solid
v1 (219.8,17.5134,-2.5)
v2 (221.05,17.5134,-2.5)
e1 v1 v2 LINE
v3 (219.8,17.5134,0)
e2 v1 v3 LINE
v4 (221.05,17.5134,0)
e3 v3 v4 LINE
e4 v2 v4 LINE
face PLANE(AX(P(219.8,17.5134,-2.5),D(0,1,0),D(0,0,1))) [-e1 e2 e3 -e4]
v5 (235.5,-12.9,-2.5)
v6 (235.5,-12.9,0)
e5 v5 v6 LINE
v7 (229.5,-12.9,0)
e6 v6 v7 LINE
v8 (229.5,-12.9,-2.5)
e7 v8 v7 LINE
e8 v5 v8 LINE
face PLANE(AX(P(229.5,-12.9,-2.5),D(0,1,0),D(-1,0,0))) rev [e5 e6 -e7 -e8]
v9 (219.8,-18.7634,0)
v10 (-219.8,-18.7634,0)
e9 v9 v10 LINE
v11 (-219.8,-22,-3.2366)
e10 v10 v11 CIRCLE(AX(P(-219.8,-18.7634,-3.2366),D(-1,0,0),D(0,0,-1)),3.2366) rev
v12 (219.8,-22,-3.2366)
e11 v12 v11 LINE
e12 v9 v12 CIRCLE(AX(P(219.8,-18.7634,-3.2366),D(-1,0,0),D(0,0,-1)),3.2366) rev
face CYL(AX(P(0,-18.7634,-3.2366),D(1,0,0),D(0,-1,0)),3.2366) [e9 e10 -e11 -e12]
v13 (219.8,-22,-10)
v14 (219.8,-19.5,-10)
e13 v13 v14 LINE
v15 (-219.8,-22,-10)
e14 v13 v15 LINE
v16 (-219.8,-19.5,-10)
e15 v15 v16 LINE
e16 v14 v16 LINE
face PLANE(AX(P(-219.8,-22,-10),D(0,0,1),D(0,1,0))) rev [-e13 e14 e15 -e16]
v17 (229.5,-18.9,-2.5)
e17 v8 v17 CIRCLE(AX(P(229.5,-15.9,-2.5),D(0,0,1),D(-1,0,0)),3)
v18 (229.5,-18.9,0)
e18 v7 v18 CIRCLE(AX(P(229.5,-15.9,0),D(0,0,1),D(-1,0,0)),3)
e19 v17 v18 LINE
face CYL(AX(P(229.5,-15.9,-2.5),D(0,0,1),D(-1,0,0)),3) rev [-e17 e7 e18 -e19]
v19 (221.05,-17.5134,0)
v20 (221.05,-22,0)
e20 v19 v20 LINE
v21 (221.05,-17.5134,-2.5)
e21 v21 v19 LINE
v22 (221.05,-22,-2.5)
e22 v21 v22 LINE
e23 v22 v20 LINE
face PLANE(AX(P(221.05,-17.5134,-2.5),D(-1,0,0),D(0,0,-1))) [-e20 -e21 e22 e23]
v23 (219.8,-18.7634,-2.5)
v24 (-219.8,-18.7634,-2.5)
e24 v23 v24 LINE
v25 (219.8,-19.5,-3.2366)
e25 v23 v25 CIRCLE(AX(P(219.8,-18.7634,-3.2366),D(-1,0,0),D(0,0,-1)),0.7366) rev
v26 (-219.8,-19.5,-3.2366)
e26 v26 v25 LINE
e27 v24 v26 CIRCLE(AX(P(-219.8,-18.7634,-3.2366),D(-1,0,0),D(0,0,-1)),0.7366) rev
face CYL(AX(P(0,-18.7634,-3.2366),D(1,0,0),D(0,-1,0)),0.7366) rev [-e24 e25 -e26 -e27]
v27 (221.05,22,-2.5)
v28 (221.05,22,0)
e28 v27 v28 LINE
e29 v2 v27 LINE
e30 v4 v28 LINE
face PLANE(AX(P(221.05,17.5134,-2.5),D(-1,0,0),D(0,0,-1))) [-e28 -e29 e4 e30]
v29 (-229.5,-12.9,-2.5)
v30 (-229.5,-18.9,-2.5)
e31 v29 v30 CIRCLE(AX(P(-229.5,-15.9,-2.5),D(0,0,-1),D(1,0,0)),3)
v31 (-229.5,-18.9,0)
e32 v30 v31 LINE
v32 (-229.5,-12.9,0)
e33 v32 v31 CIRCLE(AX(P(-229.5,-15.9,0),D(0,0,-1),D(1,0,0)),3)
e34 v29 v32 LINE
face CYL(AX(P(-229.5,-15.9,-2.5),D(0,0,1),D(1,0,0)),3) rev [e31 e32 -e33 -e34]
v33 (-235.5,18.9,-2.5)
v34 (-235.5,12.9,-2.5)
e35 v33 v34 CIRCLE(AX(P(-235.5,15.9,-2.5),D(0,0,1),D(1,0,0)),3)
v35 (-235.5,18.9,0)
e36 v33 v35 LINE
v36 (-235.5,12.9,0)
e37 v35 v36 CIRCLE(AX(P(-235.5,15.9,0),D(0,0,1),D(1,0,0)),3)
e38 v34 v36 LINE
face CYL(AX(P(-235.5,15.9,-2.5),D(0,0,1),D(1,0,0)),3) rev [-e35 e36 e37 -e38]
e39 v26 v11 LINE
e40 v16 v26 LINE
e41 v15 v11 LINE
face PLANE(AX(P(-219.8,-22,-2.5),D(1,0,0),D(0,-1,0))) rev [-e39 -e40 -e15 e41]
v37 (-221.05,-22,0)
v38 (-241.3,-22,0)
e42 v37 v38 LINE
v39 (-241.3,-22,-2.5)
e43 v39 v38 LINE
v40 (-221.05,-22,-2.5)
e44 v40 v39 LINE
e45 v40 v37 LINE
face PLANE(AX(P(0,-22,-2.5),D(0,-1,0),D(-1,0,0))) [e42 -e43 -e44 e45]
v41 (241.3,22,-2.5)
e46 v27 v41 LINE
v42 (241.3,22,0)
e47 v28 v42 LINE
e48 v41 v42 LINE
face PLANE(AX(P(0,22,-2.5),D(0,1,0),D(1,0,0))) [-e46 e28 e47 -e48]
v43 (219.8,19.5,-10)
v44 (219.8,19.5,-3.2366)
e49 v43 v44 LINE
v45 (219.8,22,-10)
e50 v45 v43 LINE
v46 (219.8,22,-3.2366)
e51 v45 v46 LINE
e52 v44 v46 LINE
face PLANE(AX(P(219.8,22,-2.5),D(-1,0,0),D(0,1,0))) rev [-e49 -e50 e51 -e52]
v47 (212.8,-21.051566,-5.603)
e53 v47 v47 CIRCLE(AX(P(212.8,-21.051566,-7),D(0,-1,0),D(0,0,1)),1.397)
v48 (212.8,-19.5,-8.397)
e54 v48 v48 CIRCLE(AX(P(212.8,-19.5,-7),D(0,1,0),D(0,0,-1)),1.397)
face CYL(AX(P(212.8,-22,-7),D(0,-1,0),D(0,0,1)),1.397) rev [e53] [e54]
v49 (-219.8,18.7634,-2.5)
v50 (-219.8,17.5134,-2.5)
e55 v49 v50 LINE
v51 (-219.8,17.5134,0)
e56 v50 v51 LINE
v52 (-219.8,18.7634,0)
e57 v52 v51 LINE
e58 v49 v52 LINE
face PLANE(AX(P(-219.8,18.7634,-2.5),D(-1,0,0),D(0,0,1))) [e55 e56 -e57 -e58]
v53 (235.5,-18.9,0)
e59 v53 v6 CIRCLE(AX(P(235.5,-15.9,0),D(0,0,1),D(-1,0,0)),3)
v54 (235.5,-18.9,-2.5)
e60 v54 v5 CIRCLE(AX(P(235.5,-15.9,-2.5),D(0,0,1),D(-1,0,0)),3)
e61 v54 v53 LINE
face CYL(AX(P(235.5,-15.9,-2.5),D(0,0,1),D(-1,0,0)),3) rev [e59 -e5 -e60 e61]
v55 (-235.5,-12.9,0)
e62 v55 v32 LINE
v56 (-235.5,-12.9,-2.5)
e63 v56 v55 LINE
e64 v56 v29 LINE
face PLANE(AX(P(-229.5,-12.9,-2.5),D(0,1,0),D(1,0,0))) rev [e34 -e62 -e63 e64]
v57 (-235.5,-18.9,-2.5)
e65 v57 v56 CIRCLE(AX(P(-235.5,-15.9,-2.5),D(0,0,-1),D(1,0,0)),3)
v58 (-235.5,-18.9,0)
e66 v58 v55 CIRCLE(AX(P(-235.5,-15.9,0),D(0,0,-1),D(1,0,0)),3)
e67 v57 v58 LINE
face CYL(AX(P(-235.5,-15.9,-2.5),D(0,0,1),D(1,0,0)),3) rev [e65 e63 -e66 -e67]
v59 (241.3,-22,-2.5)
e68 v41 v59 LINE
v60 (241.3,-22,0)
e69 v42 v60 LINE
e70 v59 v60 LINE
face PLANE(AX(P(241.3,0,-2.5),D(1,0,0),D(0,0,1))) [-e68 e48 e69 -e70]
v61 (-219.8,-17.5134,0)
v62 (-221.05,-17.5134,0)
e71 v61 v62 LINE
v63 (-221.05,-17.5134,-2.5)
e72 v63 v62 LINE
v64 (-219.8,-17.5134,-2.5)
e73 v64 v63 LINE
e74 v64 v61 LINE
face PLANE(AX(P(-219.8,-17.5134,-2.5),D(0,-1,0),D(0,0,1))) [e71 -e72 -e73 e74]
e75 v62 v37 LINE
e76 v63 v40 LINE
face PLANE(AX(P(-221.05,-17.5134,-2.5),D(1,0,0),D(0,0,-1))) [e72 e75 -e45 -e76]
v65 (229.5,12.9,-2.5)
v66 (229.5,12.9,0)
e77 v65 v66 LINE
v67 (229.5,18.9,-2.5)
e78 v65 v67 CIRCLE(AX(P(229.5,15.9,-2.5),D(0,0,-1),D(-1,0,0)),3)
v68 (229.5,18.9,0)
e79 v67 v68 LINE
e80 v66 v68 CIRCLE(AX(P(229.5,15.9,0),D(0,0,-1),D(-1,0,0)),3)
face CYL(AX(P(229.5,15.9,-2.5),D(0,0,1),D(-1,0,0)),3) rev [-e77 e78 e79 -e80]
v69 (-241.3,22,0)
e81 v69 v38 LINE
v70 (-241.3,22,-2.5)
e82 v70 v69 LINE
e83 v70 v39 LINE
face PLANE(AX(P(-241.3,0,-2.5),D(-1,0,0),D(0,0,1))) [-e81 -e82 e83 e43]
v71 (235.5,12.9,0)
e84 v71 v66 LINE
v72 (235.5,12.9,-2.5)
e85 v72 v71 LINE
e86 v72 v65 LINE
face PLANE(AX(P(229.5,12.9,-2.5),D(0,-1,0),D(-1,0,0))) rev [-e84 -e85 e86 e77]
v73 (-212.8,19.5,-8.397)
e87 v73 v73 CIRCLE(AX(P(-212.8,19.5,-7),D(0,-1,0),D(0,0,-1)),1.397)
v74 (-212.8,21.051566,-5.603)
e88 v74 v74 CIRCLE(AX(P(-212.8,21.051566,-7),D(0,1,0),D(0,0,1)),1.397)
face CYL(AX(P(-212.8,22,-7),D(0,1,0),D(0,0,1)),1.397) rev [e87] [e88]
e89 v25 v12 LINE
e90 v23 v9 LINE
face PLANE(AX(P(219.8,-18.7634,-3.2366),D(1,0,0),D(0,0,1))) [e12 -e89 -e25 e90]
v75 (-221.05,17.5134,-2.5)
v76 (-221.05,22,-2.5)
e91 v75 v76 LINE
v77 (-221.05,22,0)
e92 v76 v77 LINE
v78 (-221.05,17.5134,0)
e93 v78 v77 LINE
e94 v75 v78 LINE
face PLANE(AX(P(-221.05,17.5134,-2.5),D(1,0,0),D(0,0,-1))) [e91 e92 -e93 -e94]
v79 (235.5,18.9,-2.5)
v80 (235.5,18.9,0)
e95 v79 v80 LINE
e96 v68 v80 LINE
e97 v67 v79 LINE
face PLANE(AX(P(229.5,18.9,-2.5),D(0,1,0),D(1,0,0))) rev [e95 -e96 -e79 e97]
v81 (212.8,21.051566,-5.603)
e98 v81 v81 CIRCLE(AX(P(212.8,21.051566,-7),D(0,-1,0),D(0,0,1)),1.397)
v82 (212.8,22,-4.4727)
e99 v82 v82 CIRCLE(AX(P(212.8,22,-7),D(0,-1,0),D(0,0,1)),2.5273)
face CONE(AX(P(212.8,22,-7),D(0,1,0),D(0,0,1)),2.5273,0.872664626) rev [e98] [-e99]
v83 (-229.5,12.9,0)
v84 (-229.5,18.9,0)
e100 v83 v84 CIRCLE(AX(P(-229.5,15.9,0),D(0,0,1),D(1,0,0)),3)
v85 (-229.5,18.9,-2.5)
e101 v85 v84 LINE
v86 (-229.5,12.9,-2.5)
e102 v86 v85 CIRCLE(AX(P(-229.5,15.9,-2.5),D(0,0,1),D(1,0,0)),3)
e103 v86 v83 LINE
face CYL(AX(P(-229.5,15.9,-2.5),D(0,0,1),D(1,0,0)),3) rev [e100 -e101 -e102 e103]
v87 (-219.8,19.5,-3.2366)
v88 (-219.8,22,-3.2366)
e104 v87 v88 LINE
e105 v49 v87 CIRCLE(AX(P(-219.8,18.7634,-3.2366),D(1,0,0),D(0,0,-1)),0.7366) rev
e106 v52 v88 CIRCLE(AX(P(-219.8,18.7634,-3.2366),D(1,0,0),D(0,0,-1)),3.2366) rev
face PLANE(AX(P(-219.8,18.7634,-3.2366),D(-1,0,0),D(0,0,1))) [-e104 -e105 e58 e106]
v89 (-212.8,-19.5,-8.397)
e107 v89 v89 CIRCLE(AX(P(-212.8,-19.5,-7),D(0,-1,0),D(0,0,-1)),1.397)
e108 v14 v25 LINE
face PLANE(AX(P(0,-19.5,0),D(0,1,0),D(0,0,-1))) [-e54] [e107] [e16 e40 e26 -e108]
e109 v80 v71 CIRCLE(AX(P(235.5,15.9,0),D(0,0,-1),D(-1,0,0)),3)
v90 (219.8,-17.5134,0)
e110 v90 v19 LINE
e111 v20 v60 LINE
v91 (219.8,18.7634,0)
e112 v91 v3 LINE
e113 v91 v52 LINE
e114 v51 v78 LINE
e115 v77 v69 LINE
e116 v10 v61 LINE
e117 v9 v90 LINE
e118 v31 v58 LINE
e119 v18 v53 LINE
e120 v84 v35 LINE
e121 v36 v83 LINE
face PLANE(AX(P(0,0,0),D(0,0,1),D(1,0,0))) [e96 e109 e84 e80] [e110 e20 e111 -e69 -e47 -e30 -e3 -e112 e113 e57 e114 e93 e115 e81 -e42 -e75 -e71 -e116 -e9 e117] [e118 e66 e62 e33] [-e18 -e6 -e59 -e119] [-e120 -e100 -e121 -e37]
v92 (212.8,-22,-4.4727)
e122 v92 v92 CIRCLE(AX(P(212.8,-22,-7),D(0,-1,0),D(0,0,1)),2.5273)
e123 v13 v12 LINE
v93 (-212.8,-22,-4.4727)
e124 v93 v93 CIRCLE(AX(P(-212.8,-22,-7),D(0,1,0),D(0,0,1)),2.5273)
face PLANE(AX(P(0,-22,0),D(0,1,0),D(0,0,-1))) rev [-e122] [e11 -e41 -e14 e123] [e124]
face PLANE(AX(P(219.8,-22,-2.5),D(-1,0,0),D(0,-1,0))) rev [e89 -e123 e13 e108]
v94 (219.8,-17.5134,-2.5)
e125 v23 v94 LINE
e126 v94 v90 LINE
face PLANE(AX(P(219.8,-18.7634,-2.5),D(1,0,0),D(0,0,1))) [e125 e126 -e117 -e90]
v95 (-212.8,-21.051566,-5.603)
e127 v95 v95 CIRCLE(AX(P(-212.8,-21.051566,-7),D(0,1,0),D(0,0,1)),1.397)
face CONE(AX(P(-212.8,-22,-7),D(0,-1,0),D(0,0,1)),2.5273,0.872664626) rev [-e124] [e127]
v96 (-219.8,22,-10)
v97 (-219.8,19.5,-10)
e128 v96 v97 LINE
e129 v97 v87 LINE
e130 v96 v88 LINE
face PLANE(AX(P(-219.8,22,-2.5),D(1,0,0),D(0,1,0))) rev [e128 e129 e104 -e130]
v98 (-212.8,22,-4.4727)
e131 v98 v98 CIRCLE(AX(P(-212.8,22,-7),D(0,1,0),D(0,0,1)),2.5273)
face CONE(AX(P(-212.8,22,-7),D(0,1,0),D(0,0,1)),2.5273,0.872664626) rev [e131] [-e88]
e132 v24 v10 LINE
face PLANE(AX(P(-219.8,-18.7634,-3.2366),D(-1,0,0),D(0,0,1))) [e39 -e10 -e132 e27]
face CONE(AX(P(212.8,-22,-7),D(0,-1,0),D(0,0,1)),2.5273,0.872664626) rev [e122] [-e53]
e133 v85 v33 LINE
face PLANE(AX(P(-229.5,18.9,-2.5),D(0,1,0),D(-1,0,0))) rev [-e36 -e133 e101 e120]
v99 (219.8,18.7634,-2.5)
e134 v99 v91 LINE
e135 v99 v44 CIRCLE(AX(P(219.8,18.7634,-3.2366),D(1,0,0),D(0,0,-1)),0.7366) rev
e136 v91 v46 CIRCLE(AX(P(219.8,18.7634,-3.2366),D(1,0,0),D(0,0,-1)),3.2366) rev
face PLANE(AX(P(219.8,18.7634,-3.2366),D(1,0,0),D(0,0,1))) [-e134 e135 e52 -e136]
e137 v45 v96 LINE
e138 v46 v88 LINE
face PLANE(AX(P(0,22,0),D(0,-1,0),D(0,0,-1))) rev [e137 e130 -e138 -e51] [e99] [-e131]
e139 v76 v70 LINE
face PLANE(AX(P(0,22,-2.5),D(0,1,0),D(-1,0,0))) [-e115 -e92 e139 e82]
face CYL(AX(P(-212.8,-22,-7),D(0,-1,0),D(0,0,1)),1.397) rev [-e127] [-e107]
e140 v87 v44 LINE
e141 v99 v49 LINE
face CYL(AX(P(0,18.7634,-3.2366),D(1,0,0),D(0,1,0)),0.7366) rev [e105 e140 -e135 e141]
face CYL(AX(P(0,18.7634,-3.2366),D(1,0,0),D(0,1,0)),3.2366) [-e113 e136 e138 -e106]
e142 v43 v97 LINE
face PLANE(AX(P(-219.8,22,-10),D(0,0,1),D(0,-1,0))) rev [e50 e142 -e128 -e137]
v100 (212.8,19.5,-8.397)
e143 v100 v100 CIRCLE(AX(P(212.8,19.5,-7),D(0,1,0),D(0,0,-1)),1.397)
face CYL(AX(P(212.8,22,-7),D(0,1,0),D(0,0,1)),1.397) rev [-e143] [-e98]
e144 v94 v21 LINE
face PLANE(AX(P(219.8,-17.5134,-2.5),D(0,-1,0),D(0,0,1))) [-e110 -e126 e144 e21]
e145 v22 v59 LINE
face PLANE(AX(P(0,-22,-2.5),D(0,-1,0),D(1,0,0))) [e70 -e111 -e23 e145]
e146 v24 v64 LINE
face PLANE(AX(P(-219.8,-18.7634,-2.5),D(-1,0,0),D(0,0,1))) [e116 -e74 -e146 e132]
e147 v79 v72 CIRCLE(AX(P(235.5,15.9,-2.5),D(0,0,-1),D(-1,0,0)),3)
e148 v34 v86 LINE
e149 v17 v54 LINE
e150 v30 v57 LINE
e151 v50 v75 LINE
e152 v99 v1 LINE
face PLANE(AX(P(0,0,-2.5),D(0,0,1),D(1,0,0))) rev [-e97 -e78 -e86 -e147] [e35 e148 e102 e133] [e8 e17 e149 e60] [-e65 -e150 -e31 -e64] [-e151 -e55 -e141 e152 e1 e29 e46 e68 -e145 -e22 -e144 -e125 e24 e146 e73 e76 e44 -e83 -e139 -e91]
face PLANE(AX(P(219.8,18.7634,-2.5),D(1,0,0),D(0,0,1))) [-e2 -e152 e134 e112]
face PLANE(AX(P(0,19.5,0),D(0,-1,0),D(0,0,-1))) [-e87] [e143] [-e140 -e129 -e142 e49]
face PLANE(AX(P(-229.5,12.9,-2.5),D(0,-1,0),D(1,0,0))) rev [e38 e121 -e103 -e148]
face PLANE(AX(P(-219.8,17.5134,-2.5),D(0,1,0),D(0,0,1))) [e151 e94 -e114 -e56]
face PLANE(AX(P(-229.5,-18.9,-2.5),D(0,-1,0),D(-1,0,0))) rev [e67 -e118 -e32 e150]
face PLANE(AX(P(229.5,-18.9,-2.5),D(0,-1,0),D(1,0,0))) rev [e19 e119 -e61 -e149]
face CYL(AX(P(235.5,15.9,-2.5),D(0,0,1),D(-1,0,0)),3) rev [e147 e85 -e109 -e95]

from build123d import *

# Parameters (mm, degrees)
SKETCH1_W                                         = 241.3
SKETCH1_H                                         = 22
BASE_FLANGE_DEPTH                                 = 2.5
EDGE_FLANGE_MOUNING_STRIP_W                       = 11.4732
EDGE_FLANGE_MOUNING_STRIP_H                       = 2.5
EDGE_FLANGE_MOUNING_STRIP_CUT_DEPTH               = 219.8
EDGE_FLANGE_MOUNING_RELIEF_W                      = 12.7232
EDGE_FLANGE_MOUNING_RELIEF_H                      = 1.25
EDGE_FLANGE_MOUNING_RELIEF_CUT_DEPTH              = 2.5
EDGE_FLANGE_MOUNING_DEPTH                         = 219.8
CUT_EXTRUDE_MOUNTING_DEPTH                        = 2.5
CSK_FOR_3_FLAT_HEAD_MACHINE_SCREW_100_D           = 2.794
CSK_FOR_3_FLAT_HEAD_MACHINE_SCREW_100_CSINK_D     = 5.0546
CSK_FOR_3_FLAT_HEAD_MACHINE_SCREW_100_CSINK_ANGLE = 100


# Sheet-metal steps are written as plain solids
with BuildPart() as part:
    # Sketch1 → Base-Flange (new body)
    with BuildSketch(Plane.XY):
        with Locations((-120.65, 11)):
            Rectangle(SKETCH1_W, SKETCH1_H)
    extrude(amount=-BASE_FLANGE_DEPTH)

    # Edge-Flange-Mouning strip (across the edge) → Edge-Flange-Mouning strip cut (cut)
    with BuildSketch(Plane(origin=(-219.8, 22, -2.5), x_dir=(0, -1, 0), z_dir=(1, 0, 0))):
        with Locations((-2.5, -1.25)):
            Rectangle(EDGE_FLANGE_MOUNING_STRIP_W, EDGE_FLANGE_MOUNING_STRIP_H)
    extrude(amount=EDGE_FLANGE_MOUNING_STRIP_CUT_DEPTH, mode=Mode.SUBTRACT)

    # Edge-Flange-Mouning relief (on the sheet) → Edge-Flange-Mouning relief cut (cut)
    with BuildSketch(Plane(origin=(-219.8, 18.7634, -2.5), x_dir=(0, -1, 0), z_dir=(0, 0, -1))):
        with Locations((-5.1116, 0.625)):
            Rectangle(EDGE_FLANGE_MOUNING_RELIEF_W, EDGE_FLANGE_MOUNING_RELIEF_H)
    extrude(amount=-EDGE_FLANGE_MOUNING_RELIEF_CUT_DEPTH, mode=Mode.SUBTRACT)

    # Edge-Flange-Mouning section (across the edge) → Edge-Flange-Mouning (add)
    with BuildSketch(Plane(origin=(-219.8, 22, -2.5), x_dir=(0, -1, 0), z_dir=(1, 0, 0))):
        with BuildLine():
            Line((0, 0.7366), (0, 7.5))
            Line((0, 7.5), (2.5, 7.5))
            Line((2.5, 7.5), (2.5, 0.7366))
            ThreePointArc((2.5, 0.7366), (2.715745145, 0.215745145), (3.2366, 0))
            Line((3.2366, 0), (3.2366, -2.5))
            ThreePointArc((3.2366, -2.5), (0.947978192, -1.552021808), (0, 0.7366))
        make_face()
    extrude(amount=EDGE_FLANGE_MOUNING_DEPTH)

    # Sketch13 → Cut-Extrude-Mounting (cut)
    with BuildSketch(Plane.XY):
        with BuildLine():
            Line((-229.5, 12.9), (-235.5, 12.9))
            ThreePointArc((-235.5, 12.9), (-238.5, 15.9), (-235.5, 18.9))
            Line((-235.5, 18.9), (-229.5, 18.9))
            ThreePointArc((-229.5, 18.9), (-226.5, 15.9), (-229.5, 12.9))
        make_face()
    extrude(amount=-CUT_EXTRUDE_MOUNTING_DEPTH, mode=Mode.SUBTRACT)

    # CSK for #3 Flat Head Machine Screw (100)1 (through all)
    with Locations(Plane(origin=(0, 22, 0), x_dir=(1, 0, 0), z_dir=(0, 1, 0))):
        with Locations((-212.8, 7)):
            CounterSinkHole(CSK_FOR_3_FLAT_HEAD_MACHINE_SCREW_100_D / 2, CSK_FOR_3_FLAT_HEAD_MACHINE_SCREW_100_CSINK_D / 2, counter_sink_angle=CSK_FOR_3_FLAT_HEAD_MACHINE_SCREW_100_CSINK_ANGLE)

    # Mirror-Vertical: part across plane


with BuildPart() as part_1:
    add(part.part)
    add(part.part.mirror(Plane(origin=(0, 0, -2.5), x_dir=(0, 0, 1), z_dir=(1, 0, 0))))

    # Mirror-Horizontal: part across face


with BuildPart() as part_2:
    add(part_1.part)
    add(part_1.part.mirror(Plane(origin=(0, 0, -1.25), x_dir=(0, 0, 1), z_dir=(0, -1, 0))))


solid = part_2.part
